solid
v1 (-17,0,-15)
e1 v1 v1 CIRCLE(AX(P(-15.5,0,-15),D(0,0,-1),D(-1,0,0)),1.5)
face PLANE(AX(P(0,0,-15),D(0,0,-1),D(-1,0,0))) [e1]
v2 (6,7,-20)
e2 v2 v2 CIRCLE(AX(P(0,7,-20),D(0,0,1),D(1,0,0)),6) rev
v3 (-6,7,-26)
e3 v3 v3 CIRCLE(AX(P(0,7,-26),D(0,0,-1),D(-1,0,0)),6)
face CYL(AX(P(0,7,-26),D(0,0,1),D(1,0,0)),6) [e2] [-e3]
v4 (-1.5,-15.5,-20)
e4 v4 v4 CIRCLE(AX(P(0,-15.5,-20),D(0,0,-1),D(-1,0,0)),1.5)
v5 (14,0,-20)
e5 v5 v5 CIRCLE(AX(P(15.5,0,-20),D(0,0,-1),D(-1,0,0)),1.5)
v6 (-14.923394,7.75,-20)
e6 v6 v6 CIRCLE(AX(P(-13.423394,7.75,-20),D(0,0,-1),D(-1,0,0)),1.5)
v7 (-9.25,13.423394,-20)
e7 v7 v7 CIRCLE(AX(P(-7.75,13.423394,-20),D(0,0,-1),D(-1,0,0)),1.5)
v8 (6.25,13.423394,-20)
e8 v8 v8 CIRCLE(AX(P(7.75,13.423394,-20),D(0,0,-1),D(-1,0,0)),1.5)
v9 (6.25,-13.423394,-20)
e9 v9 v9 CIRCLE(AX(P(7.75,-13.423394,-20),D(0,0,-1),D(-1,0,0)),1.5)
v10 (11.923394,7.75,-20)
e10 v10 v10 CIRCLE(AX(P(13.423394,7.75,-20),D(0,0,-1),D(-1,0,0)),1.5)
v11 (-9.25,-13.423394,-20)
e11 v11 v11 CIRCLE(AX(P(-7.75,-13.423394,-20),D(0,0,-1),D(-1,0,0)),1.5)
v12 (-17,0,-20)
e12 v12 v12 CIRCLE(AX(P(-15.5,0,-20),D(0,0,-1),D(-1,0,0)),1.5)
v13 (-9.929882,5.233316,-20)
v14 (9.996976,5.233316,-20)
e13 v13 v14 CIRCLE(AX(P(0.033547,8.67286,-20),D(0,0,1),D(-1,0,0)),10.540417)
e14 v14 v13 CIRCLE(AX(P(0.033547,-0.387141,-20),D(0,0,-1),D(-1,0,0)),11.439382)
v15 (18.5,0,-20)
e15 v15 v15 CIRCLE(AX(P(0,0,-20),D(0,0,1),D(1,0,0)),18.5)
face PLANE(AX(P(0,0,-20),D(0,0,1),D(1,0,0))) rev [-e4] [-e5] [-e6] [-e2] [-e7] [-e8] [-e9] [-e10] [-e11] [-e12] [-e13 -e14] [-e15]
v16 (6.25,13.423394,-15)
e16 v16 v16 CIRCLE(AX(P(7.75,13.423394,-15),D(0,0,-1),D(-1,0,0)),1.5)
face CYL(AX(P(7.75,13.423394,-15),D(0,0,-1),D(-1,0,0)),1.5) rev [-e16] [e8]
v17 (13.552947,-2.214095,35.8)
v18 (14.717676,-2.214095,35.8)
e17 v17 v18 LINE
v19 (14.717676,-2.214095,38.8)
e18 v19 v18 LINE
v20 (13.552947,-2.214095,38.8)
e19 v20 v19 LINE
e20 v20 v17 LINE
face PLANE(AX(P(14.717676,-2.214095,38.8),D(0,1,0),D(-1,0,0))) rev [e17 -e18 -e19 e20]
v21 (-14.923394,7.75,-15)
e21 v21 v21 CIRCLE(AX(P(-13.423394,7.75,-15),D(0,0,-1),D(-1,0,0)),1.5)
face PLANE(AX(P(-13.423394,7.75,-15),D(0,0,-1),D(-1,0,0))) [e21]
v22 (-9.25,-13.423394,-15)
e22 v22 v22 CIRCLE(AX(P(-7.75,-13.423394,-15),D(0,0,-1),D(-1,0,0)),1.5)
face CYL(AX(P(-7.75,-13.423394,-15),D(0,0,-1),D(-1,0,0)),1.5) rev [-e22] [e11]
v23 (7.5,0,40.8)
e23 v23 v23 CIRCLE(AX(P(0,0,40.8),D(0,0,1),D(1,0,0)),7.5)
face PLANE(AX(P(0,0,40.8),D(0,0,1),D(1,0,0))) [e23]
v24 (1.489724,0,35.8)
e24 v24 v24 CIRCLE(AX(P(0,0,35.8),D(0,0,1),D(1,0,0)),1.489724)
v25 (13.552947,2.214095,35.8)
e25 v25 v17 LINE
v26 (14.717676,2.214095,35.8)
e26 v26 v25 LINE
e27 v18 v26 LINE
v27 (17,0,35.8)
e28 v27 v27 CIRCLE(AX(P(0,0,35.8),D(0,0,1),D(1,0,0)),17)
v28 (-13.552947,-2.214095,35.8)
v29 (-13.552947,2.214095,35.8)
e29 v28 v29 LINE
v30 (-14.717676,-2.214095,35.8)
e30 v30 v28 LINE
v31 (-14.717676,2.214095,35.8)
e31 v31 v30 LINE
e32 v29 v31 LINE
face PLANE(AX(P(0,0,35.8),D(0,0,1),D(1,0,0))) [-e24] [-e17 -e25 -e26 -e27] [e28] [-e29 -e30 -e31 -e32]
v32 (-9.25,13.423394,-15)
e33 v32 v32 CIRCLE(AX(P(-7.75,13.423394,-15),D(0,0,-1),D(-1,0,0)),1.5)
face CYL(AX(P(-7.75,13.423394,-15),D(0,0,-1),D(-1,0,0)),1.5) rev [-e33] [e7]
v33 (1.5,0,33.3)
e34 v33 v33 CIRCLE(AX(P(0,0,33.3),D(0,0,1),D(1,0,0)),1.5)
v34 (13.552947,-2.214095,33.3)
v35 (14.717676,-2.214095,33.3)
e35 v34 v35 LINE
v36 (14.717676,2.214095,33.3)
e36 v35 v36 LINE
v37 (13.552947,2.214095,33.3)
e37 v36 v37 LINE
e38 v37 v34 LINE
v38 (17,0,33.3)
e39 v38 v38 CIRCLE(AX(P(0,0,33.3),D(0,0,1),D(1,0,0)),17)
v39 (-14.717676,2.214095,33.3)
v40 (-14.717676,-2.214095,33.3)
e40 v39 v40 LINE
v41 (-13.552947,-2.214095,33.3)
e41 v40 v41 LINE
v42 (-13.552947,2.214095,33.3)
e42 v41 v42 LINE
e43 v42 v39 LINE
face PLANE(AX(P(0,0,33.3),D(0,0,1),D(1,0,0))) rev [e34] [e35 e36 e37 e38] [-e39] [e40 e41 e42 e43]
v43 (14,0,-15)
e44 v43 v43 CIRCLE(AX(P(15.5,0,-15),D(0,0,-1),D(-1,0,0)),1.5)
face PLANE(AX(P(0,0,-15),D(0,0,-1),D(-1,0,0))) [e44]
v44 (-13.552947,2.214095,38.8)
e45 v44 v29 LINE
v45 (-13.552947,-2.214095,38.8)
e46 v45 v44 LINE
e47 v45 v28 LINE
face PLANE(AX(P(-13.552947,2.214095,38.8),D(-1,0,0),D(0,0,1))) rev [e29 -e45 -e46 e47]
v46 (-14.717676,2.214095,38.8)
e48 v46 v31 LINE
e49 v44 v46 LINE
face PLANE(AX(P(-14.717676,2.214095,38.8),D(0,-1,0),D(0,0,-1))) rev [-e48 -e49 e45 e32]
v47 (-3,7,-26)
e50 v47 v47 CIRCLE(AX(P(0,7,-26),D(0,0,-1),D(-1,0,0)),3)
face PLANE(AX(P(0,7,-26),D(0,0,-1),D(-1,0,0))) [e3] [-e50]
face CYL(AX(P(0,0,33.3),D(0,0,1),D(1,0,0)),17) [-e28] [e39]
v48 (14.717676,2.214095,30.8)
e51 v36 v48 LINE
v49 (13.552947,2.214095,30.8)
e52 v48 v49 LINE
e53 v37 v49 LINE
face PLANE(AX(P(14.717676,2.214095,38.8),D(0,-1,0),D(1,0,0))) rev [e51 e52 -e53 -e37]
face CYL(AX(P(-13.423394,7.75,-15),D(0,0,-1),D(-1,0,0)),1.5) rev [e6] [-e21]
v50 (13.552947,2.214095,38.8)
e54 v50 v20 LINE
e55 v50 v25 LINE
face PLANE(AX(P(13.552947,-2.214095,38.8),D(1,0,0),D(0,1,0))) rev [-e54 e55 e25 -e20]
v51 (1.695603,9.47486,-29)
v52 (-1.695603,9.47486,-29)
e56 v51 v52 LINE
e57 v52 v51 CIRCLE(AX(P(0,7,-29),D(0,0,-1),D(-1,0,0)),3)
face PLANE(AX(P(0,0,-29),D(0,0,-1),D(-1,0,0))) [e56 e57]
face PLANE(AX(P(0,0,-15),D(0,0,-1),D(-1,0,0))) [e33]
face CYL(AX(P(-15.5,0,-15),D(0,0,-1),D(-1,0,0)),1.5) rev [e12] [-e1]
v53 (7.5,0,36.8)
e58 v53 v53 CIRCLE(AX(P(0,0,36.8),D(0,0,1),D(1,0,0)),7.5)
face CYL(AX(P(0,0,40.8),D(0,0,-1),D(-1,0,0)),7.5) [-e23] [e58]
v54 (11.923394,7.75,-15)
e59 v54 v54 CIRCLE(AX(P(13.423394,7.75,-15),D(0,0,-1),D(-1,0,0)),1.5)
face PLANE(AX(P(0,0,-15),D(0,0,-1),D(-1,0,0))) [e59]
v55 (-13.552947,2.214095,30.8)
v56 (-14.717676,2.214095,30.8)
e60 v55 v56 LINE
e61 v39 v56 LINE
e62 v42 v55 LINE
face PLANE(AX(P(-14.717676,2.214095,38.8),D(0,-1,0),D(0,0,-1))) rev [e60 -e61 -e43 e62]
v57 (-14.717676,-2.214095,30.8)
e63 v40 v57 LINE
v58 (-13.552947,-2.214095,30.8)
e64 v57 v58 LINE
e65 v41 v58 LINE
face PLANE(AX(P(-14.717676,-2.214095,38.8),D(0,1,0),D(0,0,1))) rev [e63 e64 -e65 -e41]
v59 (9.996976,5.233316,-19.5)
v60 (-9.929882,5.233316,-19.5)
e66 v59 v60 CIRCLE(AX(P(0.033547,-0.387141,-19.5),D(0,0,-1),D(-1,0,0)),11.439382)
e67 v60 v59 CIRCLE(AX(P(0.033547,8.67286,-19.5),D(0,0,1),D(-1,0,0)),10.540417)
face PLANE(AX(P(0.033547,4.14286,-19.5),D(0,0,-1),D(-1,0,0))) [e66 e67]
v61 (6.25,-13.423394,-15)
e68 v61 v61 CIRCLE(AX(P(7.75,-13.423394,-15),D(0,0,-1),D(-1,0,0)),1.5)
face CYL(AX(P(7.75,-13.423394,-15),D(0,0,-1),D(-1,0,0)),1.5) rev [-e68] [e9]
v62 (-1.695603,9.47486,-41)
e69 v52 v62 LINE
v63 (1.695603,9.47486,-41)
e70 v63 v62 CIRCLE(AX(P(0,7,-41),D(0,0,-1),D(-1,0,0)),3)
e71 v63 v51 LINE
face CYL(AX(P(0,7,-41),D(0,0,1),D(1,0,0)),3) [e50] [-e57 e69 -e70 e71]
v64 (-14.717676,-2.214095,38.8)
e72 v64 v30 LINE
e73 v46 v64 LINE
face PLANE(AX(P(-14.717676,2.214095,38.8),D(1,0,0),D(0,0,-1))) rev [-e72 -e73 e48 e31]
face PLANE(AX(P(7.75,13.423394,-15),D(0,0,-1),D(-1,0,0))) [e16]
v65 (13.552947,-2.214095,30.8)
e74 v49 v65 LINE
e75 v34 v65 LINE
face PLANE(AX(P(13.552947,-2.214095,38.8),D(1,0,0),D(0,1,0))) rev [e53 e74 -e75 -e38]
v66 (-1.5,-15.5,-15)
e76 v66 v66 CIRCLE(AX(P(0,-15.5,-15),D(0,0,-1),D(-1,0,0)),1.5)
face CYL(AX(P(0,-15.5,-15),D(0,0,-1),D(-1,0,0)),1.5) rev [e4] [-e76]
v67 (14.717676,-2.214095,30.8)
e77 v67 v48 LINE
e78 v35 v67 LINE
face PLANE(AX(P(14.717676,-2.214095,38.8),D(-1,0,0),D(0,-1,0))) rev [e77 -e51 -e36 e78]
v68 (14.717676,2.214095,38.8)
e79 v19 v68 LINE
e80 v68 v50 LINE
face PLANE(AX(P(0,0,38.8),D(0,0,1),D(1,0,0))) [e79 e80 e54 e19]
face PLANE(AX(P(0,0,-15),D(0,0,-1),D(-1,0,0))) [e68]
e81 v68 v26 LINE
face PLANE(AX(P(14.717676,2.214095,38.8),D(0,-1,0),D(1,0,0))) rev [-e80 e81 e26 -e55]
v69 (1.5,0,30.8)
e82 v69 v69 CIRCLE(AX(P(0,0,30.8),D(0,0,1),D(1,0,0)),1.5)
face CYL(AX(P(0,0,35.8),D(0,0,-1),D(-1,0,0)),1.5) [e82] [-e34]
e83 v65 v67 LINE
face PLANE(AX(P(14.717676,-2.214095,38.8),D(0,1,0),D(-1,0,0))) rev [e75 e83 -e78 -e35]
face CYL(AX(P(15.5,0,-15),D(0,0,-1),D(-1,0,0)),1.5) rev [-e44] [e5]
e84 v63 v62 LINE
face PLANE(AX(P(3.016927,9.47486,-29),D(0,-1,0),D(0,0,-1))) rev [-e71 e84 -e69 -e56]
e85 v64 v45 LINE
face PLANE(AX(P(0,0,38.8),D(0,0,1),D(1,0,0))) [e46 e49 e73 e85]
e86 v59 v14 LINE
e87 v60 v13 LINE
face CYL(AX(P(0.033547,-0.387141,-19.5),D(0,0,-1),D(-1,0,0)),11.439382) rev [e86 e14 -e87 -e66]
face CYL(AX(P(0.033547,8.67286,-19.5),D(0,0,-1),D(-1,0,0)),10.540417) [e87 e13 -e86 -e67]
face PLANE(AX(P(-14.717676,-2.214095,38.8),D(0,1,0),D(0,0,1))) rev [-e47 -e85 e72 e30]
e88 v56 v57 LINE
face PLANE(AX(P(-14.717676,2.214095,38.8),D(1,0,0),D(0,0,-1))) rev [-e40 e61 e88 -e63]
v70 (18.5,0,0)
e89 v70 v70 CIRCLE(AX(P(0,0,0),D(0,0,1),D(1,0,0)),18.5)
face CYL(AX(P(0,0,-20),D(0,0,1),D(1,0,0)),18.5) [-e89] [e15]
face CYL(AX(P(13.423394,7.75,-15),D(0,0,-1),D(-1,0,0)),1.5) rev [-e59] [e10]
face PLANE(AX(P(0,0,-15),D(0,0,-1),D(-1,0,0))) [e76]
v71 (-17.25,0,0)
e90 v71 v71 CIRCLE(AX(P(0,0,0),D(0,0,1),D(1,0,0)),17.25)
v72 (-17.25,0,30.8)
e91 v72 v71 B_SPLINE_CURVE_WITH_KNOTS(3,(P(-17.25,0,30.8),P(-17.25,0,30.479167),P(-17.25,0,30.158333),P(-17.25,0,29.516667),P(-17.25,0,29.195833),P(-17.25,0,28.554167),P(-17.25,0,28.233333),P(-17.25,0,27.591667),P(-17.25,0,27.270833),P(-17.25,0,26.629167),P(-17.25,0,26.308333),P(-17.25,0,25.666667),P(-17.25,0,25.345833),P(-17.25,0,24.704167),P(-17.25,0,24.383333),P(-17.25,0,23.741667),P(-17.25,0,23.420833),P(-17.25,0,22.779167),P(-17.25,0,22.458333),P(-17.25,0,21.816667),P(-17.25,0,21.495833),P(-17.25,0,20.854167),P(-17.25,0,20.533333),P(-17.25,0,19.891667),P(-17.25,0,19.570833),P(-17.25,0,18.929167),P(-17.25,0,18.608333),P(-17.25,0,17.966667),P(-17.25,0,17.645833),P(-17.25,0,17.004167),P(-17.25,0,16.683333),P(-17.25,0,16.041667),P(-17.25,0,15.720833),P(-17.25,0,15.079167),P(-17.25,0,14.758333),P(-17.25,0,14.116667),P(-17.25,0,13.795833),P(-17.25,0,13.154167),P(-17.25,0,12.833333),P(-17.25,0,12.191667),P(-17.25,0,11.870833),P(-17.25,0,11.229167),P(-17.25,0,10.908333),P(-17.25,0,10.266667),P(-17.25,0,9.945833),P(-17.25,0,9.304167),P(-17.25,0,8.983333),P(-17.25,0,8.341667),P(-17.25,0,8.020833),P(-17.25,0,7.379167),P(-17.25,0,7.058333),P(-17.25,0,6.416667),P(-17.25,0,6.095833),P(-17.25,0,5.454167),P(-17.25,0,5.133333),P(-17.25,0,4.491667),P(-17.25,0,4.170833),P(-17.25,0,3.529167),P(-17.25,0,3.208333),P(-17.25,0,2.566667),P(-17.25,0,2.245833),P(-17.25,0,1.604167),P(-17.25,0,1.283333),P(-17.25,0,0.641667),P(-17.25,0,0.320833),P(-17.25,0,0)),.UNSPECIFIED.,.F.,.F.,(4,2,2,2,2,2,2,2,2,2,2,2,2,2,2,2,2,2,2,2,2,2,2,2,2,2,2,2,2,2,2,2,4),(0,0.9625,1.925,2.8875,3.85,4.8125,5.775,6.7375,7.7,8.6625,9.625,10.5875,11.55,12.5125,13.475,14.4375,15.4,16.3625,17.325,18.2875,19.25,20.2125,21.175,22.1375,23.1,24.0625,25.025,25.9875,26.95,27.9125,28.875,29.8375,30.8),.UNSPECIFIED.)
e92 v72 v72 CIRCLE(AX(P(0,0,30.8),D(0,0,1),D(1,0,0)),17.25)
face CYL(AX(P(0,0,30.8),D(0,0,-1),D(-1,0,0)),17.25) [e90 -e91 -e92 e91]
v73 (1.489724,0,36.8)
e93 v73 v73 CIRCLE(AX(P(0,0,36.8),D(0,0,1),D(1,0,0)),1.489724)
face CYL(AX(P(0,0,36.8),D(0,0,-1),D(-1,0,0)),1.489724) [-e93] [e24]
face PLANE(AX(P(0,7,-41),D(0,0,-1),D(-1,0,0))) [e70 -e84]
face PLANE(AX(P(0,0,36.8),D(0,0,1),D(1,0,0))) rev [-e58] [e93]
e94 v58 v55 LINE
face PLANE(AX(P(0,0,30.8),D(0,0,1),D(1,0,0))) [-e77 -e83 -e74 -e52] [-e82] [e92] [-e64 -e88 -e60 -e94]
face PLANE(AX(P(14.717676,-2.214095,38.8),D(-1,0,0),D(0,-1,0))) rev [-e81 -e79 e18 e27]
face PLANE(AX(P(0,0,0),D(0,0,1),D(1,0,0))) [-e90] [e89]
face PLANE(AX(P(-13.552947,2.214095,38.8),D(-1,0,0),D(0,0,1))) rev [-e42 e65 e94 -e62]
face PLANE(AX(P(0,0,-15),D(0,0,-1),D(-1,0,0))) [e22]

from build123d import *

# Parameters (mm, degrees)
SKETCH1_R            = 18.5
BOSS_EXTRUDE2_DEPTH  = 20
SKETCH2_R            = 17.25
BOSS_EXTRUDE3_DEPTH  = 30.8
SKETCH3_R            = 1.5
BOSS_EXTRUDE4_DEPTH  = 5
SKETCH5_W            = 1.164728471
SKETCH5_H            = 4.428190706
BOSS_EXTRUDE9_DEPTH  = 8
SKETCH6_R            = 6
BOSS_EXTRUDE12_DEPTH = 6
SKETCH9_R            = 3
BOSS_EXTRUDE13_DEPTH = 15
SKETCH10_W           = 6.033853608
SKETCH10_H           = 1
CUT_EXTRUDE1_DEPTH   = 12
SKETCH11_R           = 1.5
CUT_EXTRUDE4_DEPTH   = 5
CUT_EXTRUDE5_DEPTH   = 0.5
SKETCH13_R           = 17
BOSS_EXTRUDE14_DEPTH = 2.5
SKETCH15_R           = 1.489724088
BOSS_EXTRUDE16_DEPTH = 1
SKETCH16_R           = 7.5
BOSS_EXTRUDE17_DEPTH = 4


# Read off the part's stored shape, not the designer's step: moBlkMgr[GB37]
with BuildPart() as part:
    # Sketch1 → Boss-Extrude2 (new body)
    with BuildSketch(Plane.XY):
        Circle(SKETCH1_R)
    extrude(amount=-BOSS_EXTRUDE2_DEPTH)

    # Sketch2 → Boss-Extrude3 (add)
    with BuildSketch(Plane.XY):
        with Locations(Location((0, 0, 0), (0, 0, 180))):
            Circle(SKETCH2_R)
    extrude(amount=BOSS_EXTRUDE3_DEPTH)

    # Sketch3 → Boss-Extrude4 (add)
    with BuildSketch(Plane.XY.offset(30.8)):
        Circle(SKETCH3_R)
    extrude(amount=BOSS_EXTRUDE4_DEPTH)

    # Sketch5 → Boss-Extrude9 (add)
    with BuildSketch(Plane.XY.offset(30.8)):
        with Locations((14.135311547, 0)):
            Rectangle(SKETCH5_W, SKETCH5_H)
        with Locations((-14.135311547, 0)):
            Rectangle(SKETCH5_W, SKETCH5_H)
    extrude(amount=BOSS_EXTRUDE9_DEPTH)

    # Sketch6 → Boss-Extrude12 (add)
    with BuildSketch(Plane(origin=(0, 0, -20), x_dir=(-1, 0, 0), z_dir=(0, 0, -1))):
        with Locations(Location((0, 7, 0), (0, 0, 180))):
            Circle(SKETCH6_R)
    extrude(amount=BOSS_EXTRUDE12_DEPTH)

    # Sketch9 → Boss-Extrude13 (add)
    with BuildSketch(Plane(origin=(0, 0, -26), x_dir=(-1, 0, 0), z_dir=(0, 0, -1))):
        with Locations((0, 7)):
            Circle(SKETCH9_R)
    extrude(amount=BOSS_EXTRUDE13_DEPTH)

    # Sketch10 → Cut-Extrude1 (cut)
    with BuildSketch(Plane(origin=(0, 0, -41), x_dir=(-1, 0, 0), z_dir=(0, 0, -1))):
        with Locations((0, 9.974859546)):
            Rectangle(SKETCH10_W, SKETCH10_H)
    extrude(amount=-CUT_EXTRUDE1_DEPTH, mode=Mode.SUBTRACT)

    # Sketch11 → Cut-Extrude4 (cut)
    with BuildSketch(Plane(origin=(0, 0, -20), x_dir=(-1, 0, 0), z_dir=(0, 0, -1))):
        with Locations((7.75, 13.423393759)):
            Circle(SKETCH11_R)
        with Locations((15.5, 0)):
            Circle(SKETCH11_R)
        with Locations((7.75, -13.423393759)):
            Circle(SKETCH11_R)
        with Locations((0, -15.5)):
            Circle(SKETCH11_R)
        with Locations((-7.75, -13.423393759)):
            Circle(SKETCH11_R)
        with Locations((-15.5, 0)):
            Circle(SKETCH11_R)
        with Locations((-13.423393759, 7.75)):
            Circle(SKETCH11_R)
        with Locations((-7.75, 13.423393759)):
            Circle(SKETCH11_R)
        with Locations((13.423393759, 7.75)):
            Circle(SKETCH11_R)
    extrude(amount=-CUT_EXTRUDE4_DEPTH, mode=Mode.SUBTRACT)

    # Sketch12 → Cut-Extrude5 (cut)
    with BuildSketch(Plane(origin=(0, 0, -20), x_dir=(-1, 0, 0), z_dir=(0, 0, -1))):
        with BuildLine():
            ThreePointArc((-9.996975987, 5.233316288), (-0.033546899, -11.826522584), (9.929882188, 5.233316288))
            ThreePointArc((9.929882188, 5.233316288), (-0.033546899, -1.867556413), (-9.996975987, 5.233316288))
        make_face()
    extrude(amount=-CUT_EXTRUDE5_DEPTH, mode=Mode.SUBTRACT)

    # Sketch13 → Boss-Extrude14 (add)
    with BuildSketch(Plane.XY.offset(35.8)):
        Circle(SKETCH13_R)
    extrude(amount=-BOSS_EXTRUDE14_DEPTH)

    # Sketch15 → Boss-Extrude16 (add)
    with BuildSketch(Plane.XY.offset(35.8)):
        Circle(SKETCH15_R)
    extrude(amount=BOSS_EXTRUDE16_DEPTH)

    # Sketch16 → Boss-Extrude17 (add)
    with BuildSketch(Plane.XY.offset(36.8)):
        Circle(SKETCH16_R)
    extrude(amount=BOSS_EXTRUDE17_DEPTH)


solid = part.part
